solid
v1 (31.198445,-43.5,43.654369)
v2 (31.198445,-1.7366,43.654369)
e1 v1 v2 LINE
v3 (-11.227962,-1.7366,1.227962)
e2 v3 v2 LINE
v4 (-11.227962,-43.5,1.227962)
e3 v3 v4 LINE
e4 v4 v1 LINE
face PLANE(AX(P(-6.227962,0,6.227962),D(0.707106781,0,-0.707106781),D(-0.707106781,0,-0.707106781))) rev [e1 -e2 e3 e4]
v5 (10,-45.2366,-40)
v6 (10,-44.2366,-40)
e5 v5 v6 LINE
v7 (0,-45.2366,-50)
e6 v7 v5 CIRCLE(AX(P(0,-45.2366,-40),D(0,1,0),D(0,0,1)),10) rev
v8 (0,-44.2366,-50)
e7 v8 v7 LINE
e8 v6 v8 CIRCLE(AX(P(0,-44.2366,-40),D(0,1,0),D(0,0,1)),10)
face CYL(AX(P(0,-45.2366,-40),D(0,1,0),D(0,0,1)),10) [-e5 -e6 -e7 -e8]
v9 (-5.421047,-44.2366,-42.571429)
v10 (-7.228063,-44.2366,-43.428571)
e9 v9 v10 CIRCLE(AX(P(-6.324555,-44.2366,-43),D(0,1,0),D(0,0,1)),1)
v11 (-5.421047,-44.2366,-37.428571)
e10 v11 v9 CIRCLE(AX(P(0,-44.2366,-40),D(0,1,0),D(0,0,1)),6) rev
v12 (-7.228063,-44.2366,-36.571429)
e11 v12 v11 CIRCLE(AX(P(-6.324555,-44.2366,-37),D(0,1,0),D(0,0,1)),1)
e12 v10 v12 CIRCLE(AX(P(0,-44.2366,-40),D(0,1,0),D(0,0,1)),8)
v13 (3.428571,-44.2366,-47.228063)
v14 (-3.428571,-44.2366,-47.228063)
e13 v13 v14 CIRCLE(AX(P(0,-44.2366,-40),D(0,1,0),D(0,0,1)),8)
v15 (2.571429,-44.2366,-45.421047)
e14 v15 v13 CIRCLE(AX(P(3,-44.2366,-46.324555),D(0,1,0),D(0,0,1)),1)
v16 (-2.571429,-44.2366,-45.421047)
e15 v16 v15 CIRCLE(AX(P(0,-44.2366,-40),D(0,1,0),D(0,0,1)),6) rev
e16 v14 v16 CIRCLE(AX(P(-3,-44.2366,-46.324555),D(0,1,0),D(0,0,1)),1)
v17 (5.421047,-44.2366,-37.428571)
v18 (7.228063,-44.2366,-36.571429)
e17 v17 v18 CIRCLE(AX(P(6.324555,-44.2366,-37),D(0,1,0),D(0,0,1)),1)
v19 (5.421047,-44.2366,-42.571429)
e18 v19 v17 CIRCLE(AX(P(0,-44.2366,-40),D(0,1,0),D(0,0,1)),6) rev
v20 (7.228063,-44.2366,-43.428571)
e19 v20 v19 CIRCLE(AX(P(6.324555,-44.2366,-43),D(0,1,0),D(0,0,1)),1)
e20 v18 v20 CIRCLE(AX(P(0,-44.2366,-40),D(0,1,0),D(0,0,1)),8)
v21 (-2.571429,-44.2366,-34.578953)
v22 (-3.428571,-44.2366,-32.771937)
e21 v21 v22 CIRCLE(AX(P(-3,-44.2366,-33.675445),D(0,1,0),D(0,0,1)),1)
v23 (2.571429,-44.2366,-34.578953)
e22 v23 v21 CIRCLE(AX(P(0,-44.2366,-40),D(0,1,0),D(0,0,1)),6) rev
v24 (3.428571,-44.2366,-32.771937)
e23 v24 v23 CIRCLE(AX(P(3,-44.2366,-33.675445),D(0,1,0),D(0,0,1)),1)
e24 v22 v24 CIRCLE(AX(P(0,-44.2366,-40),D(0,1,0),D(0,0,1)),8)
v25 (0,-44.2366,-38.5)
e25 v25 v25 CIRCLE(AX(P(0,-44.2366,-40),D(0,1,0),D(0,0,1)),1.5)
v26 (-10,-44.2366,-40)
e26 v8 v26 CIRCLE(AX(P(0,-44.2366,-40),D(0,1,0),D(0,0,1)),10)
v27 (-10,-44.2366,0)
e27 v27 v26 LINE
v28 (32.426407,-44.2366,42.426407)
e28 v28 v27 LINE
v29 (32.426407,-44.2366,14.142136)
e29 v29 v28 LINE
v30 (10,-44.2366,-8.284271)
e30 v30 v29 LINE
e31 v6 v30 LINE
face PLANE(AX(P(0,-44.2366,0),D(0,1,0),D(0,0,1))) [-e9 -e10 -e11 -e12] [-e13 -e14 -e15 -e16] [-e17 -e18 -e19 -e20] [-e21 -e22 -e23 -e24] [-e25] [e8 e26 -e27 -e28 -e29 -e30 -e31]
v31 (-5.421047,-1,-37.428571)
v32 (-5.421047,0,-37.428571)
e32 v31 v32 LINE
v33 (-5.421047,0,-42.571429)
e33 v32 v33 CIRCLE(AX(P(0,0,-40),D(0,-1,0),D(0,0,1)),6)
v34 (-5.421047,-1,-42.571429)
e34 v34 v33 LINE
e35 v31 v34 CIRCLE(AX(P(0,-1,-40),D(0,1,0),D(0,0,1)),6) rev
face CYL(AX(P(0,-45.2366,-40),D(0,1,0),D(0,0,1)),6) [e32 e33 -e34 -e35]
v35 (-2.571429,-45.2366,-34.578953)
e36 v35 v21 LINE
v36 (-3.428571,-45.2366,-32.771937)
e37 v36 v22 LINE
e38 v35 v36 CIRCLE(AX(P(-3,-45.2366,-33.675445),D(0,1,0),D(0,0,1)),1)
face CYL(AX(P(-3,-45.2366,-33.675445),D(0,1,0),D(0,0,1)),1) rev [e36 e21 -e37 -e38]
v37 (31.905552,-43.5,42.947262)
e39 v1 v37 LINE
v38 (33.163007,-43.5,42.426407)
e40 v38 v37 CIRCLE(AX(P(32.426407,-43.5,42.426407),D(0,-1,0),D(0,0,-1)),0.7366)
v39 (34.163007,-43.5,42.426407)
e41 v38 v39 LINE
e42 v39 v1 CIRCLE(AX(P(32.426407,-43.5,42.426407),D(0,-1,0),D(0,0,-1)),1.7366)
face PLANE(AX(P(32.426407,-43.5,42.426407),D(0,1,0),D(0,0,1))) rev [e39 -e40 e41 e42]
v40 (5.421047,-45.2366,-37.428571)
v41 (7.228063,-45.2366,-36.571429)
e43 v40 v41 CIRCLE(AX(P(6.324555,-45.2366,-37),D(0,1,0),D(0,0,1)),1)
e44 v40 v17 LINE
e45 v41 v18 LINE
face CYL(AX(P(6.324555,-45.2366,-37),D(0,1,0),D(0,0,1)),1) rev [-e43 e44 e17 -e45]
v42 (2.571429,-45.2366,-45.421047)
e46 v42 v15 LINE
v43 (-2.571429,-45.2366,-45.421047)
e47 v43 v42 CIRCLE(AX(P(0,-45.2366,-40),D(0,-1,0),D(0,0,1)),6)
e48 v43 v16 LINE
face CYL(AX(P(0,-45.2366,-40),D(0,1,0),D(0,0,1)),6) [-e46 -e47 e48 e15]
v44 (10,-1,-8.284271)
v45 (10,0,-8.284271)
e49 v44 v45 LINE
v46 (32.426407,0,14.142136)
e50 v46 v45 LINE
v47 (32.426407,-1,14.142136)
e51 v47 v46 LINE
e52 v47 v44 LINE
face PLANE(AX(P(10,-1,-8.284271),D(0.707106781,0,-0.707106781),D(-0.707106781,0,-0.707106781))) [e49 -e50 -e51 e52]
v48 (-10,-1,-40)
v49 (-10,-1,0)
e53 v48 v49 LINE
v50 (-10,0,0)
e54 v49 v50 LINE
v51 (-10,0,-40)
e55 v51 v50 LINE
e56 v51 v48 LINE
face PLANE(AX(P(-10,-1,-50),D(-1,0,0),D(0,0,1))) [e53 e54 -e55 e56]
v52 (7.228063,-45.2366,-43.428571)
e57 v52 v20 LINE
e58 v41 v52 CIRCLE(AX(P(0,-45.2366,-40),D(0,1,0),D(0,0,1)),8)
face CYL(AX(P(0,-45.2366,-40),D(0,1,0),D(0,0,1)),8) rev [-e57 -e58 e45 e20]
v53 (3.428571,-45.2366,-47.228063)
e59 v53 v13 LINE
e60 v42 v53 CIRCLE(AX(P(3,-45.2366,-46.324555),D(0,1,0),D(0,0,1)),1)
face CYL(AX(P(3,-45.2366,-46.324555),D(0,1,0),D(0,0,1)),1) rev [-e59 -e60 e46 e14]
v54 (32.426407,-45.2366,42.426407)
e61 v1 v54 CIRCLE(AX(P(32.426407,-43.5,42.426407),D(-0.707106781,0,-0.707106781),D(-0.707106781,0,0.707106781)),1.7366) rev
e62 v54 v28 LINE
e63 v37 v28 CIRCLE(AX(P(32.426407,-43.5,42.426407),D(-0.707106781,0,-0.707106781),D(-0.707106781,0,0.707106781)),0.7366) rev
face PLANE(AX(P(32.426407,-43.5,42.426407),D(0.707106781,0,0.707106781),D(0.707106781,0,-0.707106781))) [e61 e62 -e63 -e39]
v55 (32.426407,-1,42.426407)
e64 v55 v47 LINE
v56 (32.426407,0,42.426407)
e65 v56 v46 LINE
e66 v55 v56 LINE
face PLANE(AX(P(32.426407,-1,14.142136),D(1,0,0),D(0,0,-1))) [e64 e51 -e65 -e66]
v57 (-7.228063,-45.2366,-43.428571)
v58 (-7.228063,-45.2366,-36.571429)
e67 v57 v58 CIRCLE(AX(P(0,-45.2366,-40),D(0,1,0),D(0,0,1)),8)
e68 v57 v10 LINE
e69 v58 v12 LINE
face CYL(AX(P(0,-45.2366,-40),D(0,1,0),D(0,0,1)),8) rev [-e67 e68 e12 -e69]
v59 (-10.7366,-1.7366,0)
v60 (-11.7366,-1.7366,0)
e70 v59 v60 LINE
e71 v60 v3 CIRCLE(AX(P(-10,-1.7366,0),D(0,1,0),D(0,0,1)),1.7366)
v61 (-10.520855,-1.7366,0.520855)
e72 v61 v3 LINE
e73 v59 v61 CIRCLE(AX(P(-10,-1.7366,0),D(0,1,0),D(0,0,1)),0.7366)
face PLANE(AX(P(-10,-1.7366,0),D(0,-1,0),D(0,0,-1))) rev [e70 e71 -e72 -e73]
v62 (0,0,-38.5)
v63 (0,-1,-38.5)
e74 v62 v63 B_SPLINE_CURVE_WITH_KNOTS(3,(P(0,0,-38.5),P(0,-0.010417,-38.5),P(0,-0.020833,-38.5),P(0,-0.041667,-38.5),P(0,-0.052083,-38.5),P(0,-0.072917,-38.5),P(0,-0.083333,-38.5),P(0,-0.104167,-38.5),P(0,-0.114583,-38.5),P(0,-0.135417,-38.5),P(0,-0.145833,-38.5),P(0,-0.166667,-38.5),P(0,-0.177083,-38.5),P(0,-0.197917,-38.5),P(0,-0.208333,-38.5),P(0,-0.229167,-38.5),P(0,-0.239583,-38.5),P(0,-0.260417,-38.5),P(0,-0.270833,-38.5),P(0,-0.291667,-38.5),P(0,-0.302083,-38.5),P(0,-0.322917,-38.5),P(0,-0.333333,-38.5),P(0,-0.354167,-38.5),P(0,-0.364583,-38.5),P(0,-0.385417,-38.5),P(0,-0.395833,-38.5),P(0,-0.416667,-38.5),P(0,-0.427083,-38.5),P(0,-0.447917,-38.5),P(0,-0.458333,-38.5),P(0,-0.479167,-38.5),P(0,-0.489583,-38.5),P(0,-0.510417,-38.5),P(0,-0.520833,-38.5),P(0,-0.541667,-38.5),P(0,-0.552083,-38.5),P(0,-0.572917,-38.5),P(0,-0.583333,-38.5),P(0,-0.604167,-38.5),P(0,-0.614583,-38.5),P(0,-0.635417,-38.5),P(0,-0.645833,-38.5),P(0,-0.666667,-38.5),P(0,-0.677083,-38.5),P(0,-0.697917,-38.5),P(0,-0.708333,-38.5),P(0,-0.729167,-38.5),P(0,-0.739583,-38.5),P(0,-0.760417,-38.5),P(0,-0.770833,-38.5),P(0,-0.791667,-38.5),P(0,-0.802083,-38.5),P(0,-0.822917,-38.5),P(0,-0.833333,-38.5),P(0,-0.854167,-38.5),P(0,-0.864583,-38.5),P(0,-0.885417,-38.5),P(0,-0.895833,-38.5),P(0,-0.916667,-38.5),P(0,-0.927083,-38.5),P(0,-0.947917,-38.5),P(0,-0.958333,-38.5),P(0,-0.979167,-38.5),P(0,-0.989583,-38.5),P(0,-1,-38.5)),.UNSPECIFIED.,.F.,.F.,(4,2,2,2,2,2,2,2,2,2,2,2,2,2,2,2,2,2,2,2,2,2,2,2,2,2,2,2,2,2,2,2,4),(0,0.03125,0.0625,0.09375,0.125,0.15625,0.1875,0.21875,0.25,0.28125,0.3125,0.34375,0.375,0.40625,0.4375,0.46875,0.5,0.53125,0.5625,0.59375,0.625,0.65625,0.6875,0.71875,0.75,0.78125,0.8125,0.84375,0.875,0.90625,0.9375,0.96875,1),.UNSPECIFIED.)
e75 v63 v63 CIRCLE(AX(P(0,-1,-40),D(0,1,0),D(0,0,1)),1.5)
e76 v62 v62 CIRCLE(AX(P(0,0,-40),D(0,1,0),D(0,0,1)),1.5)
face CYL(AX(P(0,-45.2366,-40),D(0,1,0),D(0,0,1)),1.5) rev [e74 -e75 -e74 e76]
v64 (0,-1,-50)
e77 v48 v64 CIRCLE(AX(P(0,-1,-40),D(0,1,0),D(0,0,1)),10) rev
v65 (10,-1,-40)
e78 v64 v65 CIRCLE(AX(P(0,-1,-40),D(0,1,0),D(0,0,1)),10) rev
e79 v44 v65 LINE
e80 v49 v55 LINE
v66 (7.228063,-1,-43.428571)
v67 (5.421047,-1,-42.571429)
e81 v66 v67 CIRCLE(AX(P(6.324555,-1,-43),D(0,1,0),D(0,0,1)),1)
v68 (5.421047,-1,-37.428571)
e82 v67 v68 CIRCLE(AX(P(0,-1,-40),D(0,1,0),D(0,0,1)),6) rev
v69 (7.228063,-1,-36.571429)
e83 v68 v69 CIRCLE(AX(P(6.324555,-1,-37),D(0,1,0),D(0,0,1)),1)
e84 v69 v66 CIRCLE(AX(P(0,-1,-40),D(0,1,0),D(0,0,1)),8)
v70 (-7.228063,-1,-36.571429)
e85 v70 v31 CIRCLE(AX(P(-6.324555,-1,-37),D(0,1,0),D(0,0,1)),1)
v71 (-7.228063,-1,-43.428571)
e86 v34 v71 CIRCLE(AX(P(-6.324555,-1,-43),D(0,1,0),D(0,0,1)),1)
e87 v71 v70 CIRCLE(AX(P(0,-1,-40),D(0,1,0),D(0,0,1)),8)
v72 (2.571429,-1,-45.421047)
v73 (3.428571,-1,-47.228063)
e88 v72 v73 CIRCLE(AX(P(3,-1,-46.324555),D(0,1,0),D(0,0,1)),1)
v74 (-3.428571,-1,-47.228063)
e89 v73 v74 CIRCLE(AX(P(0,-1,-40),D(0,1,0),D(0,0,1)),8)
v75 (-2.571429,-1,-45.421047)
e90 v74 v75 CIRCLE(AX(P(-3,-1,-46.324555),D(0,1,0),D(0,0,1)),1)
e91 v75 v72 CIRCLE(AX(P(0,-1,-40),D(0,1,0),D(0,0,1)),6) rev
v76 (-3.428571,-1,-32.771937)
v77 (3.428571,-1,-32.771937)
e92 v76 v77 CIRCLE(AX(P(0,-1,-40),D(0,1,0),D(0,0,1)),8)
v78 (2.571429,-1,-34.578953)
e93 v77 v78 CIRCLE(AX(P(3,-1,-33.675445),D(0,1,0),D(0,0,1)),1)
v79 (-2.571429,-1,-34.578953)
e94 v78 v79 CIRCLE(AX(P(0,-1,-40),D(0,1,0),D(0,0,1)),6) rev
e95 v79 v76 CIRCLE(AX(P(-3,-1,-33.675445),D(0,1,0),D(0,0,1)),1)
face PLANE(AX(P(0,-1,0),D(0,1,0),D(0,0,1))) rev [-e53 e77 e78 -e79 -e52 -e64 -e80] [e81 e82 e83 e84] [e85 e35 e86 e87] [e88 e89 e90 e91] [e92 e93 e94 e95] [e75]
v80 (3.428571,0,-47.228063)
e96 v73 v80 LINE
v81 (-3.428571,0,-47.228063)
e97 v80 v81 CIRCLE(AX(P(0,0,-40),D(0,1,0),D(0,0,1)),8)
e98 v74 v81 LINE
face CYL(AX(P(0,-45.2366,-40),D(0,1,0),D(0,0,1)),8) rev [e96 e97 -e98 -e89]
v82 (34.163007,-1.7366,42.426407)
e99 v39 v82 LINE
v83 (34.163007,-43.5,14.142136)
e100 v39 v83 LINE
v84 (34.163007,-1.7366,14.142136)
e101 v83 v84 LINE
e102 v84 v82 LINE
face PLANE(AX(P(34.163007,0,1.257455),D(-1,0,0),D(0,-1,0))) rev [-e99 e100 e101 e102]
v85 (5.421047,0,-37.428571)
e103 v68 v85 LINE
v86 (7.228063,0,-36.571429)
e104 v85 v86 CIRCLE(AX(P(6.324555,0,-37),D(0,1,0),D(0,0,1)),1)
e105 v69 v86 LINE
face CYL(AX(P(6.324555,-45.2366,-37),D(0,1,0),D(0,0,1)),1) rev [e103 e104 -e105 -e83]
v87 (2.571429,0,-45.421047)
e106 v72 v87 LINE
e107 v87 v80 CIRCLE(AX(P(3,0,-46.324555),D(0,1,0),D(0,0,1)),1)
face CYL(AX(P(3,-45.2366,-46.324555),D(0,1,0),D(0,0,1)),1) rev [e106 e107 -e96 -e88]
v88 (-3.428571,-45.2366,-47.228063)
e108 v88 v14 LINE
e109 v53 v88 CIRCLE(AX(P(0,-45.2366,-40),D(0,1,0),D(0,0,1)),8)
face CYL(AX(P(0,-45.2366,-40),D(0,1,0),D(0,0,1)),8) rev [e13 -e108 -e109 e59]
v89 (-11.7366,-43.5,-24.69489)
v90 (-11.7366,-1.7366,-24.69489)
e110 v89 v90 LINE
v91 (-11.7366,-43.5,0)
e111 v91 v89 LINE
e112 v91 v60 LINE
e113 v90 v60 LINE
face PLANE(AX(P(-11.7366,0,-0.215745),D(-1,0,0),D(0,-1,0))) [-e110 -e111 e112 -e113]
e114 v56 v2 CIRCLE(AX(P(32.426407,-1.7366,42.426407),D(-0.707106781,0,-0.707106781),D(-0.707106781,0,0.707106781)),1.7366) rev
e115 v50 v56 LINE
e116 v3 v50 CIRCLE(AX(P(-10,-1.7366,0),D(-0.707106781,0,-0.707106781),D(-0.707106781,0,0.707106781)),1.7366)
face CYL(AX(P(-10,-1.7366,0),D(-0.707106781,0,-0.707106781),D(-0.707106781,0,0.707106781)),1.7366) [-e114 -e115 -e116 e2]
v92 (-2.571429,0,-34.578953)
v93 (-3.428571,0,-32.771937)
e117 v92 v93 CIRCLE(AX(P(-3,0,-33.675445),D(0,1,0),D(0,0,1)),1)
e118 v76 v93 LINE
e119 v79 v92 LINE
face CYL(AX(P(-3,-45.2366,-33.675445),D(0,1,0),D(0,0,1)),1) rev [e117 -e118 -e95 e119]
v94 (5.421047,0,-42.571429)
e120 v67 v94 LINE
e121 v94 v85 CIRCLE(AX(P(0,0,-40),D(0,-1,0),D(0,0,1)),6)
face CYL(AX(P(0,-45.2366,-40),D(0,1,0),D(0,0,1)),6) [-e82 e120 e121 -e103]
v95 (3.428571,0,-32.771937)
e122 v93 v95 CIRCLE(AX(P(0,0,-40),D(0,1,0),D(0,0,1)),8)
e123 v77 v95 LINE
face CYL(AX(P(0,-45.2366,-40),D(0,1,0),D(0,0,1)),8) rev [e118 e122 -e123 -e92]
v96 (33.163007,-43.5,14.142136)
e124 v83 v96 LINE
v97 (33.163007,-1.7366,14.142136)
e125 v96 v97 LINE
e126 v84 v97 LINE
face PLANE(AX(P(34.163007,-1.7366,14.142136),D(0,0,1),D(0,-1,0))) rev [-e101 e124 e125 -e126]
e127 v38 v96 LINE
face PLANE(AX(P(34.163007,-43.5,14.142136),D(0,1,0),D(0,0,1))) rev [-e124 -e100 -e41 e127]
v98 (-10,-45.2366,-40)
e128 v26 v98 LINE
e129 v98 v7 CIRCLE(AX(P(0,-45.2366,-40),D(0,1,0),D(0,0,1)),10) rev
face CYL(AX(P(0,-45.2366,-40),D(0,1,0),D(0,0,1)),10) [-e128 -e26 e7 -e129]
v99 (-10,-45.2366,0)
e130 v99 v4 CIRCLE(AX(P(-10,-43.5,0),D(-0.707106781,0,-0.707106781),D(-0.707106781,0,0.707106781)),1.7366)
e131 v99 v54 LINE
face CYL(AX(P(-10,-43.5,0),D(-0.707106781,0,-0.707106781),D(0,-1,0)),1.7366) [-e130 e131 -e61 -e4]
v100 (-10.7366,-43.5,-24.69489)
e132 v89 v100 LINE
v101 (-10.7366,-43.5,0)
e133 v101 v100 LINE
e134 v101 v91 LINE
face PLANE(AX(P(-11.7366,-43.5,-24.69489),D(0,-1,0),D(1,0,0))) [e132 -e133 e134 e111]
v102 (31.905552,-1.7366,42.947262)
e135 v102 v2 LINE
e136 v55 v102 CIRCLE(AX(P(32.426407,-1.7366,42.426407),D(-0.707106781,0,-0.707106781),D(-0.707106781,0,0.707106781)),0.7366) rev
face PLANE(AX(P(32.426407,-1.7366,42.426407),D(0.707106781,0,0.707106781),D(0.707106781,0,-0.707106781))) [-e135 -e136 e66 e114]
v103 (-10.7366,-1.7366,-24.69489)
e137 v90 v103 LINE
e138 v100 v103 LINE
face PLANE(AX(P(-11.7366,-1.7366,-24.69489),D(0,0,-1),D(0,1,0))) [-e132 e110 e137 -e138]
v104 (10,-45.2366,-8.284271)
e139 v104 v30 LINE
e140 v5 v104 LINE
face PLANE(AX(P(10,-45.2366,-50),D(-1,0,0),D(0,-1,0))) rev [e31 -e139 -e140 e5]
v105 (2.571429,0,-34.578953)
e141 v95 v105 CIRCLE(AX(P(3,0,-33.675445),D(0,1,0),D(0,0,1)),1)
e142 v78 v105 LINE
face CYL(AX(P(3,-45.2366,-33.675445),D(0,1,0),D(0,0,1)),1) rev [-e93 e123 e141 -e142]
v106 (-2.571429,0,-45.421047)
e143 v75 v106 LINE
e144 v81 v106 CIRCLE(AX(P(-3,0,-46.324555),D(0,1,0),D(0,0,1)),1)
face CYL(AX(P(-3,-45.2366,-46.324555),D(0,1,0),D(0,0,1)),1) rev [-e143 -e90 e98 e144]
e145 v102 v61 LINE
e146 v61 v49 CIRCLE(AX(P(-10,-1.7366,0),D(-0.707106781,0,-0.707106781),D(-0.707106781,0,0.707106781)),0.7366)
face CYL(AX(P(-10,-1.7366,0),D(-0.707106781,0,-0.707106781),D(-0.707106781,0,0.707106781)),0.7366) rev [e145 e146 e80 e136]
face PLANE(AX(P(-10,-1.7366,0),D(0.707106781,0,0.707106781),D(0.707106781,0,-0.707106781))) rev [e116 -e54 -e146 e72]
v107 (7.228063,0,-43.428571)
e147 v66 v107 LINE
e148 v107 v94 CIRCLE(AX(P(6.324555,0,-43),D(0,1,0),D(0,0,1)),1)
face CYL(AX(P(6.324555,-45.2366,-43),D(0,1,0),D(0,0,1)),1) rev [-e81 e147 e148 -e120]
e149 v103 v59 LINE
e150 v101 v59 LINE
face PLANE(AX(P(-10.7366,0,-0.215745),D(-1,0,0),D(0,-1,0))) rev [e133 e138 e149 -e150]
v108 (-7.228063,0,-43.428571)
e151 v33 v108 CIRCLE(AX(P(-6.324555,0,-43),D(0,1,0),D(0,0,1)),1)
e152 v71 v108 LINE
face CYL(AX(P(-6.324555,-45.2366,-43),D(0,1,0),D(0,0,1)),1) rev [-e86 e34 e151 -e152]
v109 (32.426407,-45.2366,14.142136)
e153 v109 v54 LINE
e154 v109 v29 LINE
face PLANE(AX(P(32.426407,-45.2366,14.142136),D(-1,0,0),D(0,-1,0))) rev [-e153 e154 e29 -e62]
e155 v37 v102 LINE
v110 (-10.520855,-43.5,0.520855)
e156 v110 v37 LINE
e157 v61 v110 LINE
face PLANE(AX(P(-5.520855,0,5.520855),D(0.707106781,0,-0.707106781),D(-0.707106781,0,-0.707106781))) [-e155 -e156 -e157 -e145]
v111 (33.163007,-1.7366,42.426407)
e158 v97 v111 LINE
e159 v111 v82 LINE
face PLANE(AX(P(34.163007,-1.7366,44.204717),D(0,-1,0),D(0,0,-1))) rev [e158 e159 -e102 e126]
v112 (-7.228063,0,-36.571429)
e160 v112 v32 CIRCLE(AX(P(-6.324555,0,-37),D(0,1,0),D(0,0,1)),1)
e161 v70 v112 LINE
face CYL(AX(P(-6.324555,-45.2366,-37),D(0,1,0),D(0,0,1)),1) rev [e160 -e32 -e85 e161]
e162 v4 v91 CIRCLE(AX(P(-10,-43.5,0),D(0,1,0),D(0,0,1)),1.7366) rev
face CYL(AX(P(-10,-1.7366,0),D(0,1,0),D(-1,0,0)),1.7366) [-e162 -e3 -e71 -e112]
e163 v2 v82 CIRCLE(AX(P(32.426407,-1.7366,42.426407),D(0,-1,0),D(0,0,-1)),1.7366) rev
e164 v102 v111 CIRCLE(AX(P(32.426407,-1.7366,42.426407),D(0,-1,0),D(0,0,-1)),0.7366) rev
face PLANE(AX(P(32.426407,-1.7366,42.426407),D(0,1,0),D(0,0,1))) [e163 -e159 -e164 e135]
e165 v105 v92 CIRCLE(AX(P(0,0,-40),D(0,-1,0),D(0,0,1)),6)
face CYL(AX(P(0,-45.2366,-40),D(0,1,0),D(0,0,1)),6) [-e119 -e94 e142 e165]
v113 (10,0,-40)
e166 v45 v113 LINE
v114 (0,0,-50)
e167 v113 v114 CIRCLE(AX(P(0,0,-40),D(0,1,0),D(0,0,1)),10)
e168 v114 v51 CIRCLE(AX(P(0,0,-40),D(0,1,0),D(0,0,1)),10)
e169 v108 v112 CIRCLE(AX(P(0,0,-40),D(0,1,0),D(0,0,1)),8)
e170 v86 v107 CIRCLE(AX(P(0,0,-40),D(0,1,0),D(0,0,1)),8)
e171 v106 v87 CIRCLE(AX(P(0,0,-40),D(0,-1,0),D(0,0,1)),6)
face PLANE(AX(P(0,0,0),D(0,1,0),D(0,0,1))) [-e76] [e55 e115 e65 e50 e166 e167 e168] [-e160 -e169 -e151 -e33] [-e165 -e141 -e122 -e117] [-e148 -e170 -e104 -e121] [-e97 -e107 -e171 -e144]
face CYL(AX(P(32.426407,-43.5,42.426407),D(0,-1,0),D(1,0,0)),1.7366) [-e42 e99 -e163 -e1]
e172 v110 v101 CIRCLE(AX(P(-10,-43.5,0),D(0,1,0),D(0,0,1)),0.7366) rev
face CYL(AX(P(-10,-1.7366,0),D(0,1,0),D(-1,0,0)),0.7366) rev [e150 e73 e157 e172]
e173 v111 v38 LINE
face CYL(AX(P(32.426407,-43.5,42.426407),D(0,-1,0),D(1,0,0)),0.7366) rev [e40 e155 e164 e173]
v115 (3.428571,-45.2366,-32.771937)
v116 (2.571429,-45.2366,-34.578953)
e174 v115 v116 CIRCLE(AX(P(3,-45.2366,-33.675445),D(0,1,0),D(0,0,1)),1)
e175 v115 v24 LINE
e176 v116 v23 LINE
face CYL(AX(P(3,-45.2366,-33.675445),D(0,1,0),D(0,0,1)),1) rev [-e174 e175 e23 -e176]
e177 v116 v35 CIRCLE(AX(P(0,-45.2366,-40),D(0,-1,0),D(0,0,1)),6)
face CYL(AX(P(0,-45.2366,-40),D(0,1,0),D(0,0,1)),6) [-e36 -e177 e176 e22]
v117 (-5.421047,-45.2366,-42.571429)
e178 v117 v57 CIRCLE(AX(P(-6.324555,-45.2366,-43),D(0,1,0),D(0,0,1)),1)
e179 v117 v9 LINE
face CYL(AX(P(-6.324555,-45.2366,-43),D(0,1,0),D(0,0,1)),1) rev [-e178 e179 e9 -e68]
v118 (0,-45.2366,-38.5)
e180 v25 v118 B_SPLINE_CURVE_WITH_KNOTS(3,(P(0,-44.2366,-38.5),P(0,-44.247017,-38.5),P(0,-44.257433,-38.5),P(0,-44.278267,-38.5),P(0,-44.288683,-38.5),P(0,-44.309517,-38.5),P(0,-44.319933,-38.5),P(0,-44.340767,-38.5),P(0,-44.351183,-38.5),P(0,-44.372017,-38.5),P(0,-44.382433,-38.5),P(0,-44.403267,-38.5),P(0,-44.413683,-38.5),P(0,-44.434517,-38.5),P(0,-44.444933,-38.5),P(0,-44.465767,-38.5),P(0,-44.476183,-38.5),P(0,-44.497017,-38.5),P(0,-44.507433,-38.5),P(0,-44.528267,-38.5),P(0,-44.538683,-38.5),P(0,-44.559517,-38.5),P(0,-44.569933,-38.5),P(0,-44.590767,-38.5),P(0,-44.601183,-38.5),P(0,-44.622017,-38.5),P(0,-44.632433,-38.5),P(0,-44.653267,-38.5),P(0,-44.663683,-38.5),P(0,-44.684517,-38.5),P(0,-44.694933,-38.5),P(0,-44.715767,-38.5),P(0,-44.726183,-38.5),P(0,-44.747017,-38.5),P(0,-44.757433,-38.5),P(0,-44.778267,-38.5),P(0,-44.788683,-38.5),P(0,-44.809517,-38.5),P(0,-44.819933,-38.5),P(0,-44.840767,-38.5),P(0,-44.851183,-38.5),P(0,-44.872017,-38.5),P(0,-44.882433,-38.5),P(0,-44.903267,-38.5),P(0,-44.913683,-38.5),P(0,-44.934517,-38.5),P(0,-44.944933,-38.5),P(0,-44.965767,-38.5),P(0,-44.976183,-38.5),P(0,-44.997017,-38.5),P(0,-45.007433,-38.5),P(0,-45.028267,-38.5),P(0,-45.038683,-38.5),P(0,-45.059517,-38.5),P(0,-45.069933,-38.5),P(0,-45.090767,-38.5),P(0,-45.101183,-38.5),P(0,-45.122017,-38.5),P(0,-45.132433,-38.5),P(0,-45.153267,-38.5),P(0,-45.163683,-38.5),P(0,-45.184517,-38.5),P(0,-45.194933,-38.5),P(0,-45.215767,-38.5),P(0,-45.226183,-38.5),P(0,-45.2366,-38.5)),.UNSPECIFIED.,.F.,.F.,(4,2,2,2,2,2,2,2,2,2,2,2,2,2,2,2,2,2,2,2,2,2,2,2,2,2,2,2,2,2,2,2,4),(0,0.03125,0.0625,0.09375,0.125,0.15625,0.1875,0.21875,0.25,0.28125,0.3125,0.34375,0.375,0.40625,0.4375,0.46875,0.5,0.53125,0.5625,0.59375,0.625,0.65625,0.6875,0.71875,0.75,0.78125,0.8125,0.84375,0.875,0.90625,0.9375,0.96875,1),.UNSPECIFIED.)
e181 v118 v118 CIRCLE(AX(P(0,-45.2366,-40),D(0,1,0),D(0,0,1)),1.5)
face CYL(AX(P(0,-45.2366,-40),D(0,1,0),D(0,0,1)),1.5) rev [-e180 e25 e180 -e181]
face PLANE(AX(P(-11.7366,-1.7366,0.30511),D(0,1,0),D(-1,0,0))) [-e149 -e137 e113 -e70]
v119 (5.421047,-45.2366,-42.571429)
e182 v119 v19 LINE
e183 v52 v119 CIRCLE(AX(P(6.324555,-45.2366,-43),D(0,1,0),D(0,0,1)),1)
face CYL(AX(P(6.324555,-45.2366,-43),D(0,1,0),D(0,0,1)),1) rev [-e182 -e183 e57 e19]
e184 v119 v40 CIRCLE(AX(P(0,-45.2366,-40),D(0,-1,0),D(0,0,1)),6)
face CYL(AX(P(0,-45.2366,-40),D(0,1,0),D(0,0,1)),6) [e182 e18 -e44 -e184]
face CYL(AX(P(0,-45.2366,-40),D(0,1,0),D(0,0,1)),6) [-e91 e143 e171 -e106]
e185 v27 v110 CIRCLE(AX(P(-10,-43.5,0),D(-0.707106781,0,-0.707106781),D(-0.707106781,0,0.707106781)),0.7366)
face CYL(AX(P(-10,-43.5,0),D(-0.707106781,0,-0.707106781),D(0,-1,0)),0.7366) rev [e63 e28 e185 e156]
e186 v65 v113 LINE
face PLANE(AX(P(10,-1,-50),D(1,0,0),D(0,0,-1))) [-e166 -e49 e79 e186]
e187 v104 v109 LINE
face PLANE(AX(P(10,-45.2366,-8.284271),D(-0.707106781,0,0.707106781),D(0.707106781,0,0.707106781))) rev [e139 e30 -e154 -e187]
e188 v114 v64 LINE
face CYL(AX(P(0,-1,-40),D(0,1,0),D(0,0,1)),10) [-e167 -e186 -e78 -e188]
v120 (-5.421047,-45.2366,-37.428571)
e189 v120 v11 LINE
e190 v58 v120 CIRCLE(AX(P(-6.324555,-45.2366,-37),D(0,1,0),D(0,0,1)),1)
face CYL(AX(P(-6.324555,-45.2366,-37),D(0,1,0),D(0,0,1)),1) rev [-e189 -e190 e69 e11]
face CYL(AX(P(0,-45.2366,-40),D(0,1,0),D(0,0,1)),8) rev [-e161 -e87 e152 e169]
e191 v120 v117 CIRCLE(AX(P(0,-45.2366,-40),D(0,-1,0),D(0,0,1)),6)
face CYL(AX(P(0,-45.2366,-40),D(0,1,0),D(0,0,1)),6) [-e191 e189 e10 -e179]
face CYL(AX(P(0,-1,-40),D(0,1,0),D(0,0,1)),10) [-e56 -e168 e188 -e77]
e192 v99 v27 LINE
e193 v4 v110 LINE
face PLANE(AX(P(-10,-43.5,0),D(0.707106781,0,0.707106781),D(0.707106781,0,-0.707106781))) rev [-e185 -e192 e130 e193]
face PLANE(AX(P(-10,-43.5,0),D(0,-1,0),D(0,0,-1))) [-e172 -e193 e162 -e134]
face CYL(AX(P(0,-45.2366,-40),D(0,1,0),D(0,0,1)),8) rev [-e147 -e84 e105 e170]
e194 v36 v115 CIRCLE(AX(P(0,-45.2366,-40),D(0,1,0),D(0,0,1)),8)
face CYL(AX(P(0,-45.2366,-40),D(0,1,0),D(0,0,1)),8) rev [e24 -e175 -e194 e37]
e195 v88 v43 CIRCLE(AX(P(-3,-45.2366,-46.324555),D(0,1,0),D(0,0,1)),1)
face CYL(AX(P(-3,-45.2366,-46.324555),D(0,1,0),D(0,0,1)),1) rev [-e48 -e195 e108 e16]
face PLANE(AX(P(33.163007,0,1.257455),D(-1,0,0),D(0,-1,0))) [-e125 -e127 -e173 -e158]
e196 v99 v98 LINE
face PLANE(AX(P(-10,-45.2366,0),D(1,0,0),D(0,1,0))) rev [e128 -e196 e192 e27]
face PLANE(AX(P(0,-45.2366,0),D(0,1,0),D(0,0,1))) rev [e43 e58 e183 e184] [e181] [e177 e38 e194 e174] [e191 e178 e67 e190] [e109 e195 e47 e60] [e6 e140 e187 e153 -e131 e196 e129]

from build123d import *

# Parameters (mm, degrees)
SM_BASE_FLANGE_1_DEPTH      = 1
SM_EDGE_FLANGE_1_DEPTH      = 60
SM_EDGE_FLANGE_2_DEPTH      = 60
SM_START                    = 1
SM_EDGE_FLANGE_2_FLAT_DEPTH = 1
SKETCH_16_R                 = 1.5
CUT_EXTRUDE_1_DEPTH         = 75.818592891
FILLET_1_R                  = 10
SM_EDGE_FLANGE_4_DEPTH      = 41.7634
SM_EDGE_FLANGE_5_DEPTH      = 41.7634


# Sheet-metal steps are written as plain solids
with BuildPart() as part:
    # Sketch 1 → 基材-凸緣1 (new body)
    with BuildSketch(Plane(origin=(0, 0, 0), x_dir=(1, 0, 0), z_dir=(0, 1, 0))):
        Polygon((-10, 0), (32.426406871, -42.426406871), (32.426406871, -14.142135624), (10, 8.284271247), (10, 50), (-10, 50), align=None)
    extrude(amount=-SM_BASE_FLANGE_1_DEPTH)

    # 邊線-凸緣1 section (across the edge) → 邊線-凸緣1 (add)
    with BuildSketch(Plane(origin=(31.905552016, -1, 42.947261726), x_dir=(0.7071067811865475, -3.4914813388431334e-15, -0.7071067811865476), z_dir=(-0.7071067811865476, 0, -0.7071067811865475))):
        with BuildLine():
            Line((-1, 0.7366), (-1, 42.5))
            Line((-1, 42.5), (0, 42.5))
            Line((0, 42.5), (0, 0.7366))
            ThreePointArc((0, 0.7366), (0.215745145, 0.215745145), (0.7366, 0))
            Line((0.7366, 0), (0.7366, -1))
            ThreePointArc((0.7366, -1), (-0.491361636, -0.491361636), (-1, 0.7366))
        make_face()
    extrude(amount=SM_EDGE_FLANGE_1_DEPTH)

    # 邊線-凸緣2 bend section (across the edge) → 邊線-凸緣2 (add)
    with BuildSketch(Plane(origin=(31.905552016, -44.2366, 42.947261726), x_dir=(0, 1, 0), z_dir=(-0.7071067811865477, 0, -0.7071067811865475))):
        with BuildLine():
            Line((-1, 0.7366), (0, 0.7366))
            ThreePointArc((0, 0.7366), (0.215745145, 0.215745145), (0.7366, 0))
            Line((0.7366, 0), (0.7366, -1))
            ThreePointArc((0.7366, -1), (-0.491361636, -0.491361636), (-1, 0.7366))
        make_face()
    extrude(amount=SM_EDGE_FLANGE_2_DEPTH)

    # 邊線-凸緣2 profile (on flange) → 邊線-凸緣2 flat (add)
    with BuildSketch(Plane(origin=(-5.520854855, -44.2366, 5.520854855), x_dir=(-0.7071067811865477, 0, -0.7071067811865475), z_dir=(0, -1, 0)).offset(SM_START)):
        Polygon((7.071067812, 0.7366), (42.426406871, 36.091939059), (28.284271247, 50.234074683), (-1.213203436, 20.7366), (-32.928932188, 20.7366), (-52.928932188, 0.7366), align=None)
    extrude(amount=-SM_EDGE_FLANGE_2_FLAT_DEPTH)

    # 草圖16 → 除料-伸長1 (cut, through all)
    with BuildSketch(Plane(origin=(0, 0, 0), x_dir=(1, 0, 0), z_dir=(0, 1, 0))):
        with Locations(Location((0, 40, 0), (0, 0, 270))):
            Circle(SKETCH_16_R)
        with BuildLine():
            ThreePointArc((3.428571429, 47.228063223), (0, 48), (-3.428571429, 47.228063223))
            ThreePointArc((-3.428571429, 47.228063223), (-3.903507903, 45.895983892), (-2.571428571, 45.421047417))
            ThreePointArc((-2.571428571, 45.421047417), (0, 46), (2.571428571, 45.421047417))
            ThreePointArc((2.571428571, 45.421047417), (3.903507903, 45.895983892), (3.428571429, 47.228063223))
        make_face()
        with BuildLine():
            ThreePointArc((7.228063223, 36.571428571), (8, 40), (7.228063223, 43.428571429))
            ThreePointArc((7.228063223, 43.428571429), (5.895983892, 43.903507903), (5.421047417, 42.571428571))
            ThreePointArc((5.421047417, 42.571428571), (6, 40), (5.421047417, 37.428571429))
            ThreePointArc((5.421047417, 37.428571429), (5.895983892, 36.096492097), (7.228063223, 36.571428571))
        make_face()
        with BuildLine():
            ThreePointArc((-3.428571429, 32.771936777), (0, 32), (3.428571429, 32.771936777))
            ThreePointArc((3.428571429, 32.771936777), (3.903507903, 34.104016108), (2.571428571, 34.578952583))
            ThreePointArc((2.571428571, 34.578952583), (0, 34), (-2.571428571, 34.578952583))
            ThreePointArc((-2.571428571, 34.578952583), (-3.903507903, 34.104016108), (-3.428571429, 32.771936777))
        make_face()
        with BuildLine():
            ThreePointArc((-7.228063223, 43.428571429), (-8, 40), (-7.228063223, 36.571428571))
            ThreePointArc((-7.228063223, 36.571428571), (-5.895983892, 36.096492097), (-5.421047417, 37.428571429))
            ThreePointArc((-5.421047417, 37.428571429), (-6, 40), (-5.421047417, 42.571428571))
            ThreePointArc((-5.421047417, 42.571428571), (-5.895983892, 43.903507903), (-7.228063223, 43.428571429))
        make_face()
    extrude(amount=-CUT_EXTRUDE_1_DEPTH, mode=Mode.SUBTRACT)

    # 圓角1
    fillet_1_edges = [part.edges().sort_by_distance(p)[0] for p in [
        (-10, -0.5, -50),
        (10, -0.5, -50),
        (-10, -44.7366, -50),
        (10, -44.7366, -50),
    ]]
    fillet(fillet_1_edges, radius=FILLET_1_R - 0.0001)  # a hair under: the kernel refuses the full size

    # 邊線-凸緣4 section (across the edge) → 邊線-凸緣4 (add)
    with BuildSketch(Plane(origin=(33.163006871, -1.7366, 44.204716581), x_dir=(-1, 0, 0), z_dir=(0, -1, 0))):
        with BuildLine():
            Line((-1, 1.77830971), (-1, 30.062580958))
            Line((-1, 30.062580958), (0, 30.062580958))
            Line((0, 30.062580958), (0, 1.77830971))
            ThreePointArc((0, 1.77830971), (0.454715384, 1.097780046), (1.257454855, 1.257454855))
            Line((1.257454855, 1.257454855), (1.964561636, 0.550348074))
            ThreePointArc((1.964561636, 0.550348074), (0.072031951, 0.173900514), (-1, 1.77830971))
        make_face()
    extrude(amount=SM_EDGE_FLANGE_4_DEPTH)

    # 邊線-凸緣5 section (across the edge) → 邊線-凸緣5 (add)
    with BuildSketch(Plane(origin=(-10.7366, -43.5, 0.30510971), x_dir=(1, 0, 0), z_dir=(0, 1, 0))):
        with BuildLine():
            Line((-1, 0.30510971), (-1, 25))
            Line((-1, 25), (0, 25))
            Line((0, 25), (0, 0.30510971))
            ThreePointArc((0, 0.30510971), (0.056070336, 0.023225094), (0.215745145, -0.215745145))
            Line((0.215745145, -0.215745145), (-0.491361636, -0.922851926))
            ThreePointArc((-0.491361636, -0.922851926), (-0.867809196, -0.359458339), (-1, 0.30510971))
        make_face()
    extrude(amount=SM_EDGE_FLANGE_5_DEPTH)


solid = part.part
